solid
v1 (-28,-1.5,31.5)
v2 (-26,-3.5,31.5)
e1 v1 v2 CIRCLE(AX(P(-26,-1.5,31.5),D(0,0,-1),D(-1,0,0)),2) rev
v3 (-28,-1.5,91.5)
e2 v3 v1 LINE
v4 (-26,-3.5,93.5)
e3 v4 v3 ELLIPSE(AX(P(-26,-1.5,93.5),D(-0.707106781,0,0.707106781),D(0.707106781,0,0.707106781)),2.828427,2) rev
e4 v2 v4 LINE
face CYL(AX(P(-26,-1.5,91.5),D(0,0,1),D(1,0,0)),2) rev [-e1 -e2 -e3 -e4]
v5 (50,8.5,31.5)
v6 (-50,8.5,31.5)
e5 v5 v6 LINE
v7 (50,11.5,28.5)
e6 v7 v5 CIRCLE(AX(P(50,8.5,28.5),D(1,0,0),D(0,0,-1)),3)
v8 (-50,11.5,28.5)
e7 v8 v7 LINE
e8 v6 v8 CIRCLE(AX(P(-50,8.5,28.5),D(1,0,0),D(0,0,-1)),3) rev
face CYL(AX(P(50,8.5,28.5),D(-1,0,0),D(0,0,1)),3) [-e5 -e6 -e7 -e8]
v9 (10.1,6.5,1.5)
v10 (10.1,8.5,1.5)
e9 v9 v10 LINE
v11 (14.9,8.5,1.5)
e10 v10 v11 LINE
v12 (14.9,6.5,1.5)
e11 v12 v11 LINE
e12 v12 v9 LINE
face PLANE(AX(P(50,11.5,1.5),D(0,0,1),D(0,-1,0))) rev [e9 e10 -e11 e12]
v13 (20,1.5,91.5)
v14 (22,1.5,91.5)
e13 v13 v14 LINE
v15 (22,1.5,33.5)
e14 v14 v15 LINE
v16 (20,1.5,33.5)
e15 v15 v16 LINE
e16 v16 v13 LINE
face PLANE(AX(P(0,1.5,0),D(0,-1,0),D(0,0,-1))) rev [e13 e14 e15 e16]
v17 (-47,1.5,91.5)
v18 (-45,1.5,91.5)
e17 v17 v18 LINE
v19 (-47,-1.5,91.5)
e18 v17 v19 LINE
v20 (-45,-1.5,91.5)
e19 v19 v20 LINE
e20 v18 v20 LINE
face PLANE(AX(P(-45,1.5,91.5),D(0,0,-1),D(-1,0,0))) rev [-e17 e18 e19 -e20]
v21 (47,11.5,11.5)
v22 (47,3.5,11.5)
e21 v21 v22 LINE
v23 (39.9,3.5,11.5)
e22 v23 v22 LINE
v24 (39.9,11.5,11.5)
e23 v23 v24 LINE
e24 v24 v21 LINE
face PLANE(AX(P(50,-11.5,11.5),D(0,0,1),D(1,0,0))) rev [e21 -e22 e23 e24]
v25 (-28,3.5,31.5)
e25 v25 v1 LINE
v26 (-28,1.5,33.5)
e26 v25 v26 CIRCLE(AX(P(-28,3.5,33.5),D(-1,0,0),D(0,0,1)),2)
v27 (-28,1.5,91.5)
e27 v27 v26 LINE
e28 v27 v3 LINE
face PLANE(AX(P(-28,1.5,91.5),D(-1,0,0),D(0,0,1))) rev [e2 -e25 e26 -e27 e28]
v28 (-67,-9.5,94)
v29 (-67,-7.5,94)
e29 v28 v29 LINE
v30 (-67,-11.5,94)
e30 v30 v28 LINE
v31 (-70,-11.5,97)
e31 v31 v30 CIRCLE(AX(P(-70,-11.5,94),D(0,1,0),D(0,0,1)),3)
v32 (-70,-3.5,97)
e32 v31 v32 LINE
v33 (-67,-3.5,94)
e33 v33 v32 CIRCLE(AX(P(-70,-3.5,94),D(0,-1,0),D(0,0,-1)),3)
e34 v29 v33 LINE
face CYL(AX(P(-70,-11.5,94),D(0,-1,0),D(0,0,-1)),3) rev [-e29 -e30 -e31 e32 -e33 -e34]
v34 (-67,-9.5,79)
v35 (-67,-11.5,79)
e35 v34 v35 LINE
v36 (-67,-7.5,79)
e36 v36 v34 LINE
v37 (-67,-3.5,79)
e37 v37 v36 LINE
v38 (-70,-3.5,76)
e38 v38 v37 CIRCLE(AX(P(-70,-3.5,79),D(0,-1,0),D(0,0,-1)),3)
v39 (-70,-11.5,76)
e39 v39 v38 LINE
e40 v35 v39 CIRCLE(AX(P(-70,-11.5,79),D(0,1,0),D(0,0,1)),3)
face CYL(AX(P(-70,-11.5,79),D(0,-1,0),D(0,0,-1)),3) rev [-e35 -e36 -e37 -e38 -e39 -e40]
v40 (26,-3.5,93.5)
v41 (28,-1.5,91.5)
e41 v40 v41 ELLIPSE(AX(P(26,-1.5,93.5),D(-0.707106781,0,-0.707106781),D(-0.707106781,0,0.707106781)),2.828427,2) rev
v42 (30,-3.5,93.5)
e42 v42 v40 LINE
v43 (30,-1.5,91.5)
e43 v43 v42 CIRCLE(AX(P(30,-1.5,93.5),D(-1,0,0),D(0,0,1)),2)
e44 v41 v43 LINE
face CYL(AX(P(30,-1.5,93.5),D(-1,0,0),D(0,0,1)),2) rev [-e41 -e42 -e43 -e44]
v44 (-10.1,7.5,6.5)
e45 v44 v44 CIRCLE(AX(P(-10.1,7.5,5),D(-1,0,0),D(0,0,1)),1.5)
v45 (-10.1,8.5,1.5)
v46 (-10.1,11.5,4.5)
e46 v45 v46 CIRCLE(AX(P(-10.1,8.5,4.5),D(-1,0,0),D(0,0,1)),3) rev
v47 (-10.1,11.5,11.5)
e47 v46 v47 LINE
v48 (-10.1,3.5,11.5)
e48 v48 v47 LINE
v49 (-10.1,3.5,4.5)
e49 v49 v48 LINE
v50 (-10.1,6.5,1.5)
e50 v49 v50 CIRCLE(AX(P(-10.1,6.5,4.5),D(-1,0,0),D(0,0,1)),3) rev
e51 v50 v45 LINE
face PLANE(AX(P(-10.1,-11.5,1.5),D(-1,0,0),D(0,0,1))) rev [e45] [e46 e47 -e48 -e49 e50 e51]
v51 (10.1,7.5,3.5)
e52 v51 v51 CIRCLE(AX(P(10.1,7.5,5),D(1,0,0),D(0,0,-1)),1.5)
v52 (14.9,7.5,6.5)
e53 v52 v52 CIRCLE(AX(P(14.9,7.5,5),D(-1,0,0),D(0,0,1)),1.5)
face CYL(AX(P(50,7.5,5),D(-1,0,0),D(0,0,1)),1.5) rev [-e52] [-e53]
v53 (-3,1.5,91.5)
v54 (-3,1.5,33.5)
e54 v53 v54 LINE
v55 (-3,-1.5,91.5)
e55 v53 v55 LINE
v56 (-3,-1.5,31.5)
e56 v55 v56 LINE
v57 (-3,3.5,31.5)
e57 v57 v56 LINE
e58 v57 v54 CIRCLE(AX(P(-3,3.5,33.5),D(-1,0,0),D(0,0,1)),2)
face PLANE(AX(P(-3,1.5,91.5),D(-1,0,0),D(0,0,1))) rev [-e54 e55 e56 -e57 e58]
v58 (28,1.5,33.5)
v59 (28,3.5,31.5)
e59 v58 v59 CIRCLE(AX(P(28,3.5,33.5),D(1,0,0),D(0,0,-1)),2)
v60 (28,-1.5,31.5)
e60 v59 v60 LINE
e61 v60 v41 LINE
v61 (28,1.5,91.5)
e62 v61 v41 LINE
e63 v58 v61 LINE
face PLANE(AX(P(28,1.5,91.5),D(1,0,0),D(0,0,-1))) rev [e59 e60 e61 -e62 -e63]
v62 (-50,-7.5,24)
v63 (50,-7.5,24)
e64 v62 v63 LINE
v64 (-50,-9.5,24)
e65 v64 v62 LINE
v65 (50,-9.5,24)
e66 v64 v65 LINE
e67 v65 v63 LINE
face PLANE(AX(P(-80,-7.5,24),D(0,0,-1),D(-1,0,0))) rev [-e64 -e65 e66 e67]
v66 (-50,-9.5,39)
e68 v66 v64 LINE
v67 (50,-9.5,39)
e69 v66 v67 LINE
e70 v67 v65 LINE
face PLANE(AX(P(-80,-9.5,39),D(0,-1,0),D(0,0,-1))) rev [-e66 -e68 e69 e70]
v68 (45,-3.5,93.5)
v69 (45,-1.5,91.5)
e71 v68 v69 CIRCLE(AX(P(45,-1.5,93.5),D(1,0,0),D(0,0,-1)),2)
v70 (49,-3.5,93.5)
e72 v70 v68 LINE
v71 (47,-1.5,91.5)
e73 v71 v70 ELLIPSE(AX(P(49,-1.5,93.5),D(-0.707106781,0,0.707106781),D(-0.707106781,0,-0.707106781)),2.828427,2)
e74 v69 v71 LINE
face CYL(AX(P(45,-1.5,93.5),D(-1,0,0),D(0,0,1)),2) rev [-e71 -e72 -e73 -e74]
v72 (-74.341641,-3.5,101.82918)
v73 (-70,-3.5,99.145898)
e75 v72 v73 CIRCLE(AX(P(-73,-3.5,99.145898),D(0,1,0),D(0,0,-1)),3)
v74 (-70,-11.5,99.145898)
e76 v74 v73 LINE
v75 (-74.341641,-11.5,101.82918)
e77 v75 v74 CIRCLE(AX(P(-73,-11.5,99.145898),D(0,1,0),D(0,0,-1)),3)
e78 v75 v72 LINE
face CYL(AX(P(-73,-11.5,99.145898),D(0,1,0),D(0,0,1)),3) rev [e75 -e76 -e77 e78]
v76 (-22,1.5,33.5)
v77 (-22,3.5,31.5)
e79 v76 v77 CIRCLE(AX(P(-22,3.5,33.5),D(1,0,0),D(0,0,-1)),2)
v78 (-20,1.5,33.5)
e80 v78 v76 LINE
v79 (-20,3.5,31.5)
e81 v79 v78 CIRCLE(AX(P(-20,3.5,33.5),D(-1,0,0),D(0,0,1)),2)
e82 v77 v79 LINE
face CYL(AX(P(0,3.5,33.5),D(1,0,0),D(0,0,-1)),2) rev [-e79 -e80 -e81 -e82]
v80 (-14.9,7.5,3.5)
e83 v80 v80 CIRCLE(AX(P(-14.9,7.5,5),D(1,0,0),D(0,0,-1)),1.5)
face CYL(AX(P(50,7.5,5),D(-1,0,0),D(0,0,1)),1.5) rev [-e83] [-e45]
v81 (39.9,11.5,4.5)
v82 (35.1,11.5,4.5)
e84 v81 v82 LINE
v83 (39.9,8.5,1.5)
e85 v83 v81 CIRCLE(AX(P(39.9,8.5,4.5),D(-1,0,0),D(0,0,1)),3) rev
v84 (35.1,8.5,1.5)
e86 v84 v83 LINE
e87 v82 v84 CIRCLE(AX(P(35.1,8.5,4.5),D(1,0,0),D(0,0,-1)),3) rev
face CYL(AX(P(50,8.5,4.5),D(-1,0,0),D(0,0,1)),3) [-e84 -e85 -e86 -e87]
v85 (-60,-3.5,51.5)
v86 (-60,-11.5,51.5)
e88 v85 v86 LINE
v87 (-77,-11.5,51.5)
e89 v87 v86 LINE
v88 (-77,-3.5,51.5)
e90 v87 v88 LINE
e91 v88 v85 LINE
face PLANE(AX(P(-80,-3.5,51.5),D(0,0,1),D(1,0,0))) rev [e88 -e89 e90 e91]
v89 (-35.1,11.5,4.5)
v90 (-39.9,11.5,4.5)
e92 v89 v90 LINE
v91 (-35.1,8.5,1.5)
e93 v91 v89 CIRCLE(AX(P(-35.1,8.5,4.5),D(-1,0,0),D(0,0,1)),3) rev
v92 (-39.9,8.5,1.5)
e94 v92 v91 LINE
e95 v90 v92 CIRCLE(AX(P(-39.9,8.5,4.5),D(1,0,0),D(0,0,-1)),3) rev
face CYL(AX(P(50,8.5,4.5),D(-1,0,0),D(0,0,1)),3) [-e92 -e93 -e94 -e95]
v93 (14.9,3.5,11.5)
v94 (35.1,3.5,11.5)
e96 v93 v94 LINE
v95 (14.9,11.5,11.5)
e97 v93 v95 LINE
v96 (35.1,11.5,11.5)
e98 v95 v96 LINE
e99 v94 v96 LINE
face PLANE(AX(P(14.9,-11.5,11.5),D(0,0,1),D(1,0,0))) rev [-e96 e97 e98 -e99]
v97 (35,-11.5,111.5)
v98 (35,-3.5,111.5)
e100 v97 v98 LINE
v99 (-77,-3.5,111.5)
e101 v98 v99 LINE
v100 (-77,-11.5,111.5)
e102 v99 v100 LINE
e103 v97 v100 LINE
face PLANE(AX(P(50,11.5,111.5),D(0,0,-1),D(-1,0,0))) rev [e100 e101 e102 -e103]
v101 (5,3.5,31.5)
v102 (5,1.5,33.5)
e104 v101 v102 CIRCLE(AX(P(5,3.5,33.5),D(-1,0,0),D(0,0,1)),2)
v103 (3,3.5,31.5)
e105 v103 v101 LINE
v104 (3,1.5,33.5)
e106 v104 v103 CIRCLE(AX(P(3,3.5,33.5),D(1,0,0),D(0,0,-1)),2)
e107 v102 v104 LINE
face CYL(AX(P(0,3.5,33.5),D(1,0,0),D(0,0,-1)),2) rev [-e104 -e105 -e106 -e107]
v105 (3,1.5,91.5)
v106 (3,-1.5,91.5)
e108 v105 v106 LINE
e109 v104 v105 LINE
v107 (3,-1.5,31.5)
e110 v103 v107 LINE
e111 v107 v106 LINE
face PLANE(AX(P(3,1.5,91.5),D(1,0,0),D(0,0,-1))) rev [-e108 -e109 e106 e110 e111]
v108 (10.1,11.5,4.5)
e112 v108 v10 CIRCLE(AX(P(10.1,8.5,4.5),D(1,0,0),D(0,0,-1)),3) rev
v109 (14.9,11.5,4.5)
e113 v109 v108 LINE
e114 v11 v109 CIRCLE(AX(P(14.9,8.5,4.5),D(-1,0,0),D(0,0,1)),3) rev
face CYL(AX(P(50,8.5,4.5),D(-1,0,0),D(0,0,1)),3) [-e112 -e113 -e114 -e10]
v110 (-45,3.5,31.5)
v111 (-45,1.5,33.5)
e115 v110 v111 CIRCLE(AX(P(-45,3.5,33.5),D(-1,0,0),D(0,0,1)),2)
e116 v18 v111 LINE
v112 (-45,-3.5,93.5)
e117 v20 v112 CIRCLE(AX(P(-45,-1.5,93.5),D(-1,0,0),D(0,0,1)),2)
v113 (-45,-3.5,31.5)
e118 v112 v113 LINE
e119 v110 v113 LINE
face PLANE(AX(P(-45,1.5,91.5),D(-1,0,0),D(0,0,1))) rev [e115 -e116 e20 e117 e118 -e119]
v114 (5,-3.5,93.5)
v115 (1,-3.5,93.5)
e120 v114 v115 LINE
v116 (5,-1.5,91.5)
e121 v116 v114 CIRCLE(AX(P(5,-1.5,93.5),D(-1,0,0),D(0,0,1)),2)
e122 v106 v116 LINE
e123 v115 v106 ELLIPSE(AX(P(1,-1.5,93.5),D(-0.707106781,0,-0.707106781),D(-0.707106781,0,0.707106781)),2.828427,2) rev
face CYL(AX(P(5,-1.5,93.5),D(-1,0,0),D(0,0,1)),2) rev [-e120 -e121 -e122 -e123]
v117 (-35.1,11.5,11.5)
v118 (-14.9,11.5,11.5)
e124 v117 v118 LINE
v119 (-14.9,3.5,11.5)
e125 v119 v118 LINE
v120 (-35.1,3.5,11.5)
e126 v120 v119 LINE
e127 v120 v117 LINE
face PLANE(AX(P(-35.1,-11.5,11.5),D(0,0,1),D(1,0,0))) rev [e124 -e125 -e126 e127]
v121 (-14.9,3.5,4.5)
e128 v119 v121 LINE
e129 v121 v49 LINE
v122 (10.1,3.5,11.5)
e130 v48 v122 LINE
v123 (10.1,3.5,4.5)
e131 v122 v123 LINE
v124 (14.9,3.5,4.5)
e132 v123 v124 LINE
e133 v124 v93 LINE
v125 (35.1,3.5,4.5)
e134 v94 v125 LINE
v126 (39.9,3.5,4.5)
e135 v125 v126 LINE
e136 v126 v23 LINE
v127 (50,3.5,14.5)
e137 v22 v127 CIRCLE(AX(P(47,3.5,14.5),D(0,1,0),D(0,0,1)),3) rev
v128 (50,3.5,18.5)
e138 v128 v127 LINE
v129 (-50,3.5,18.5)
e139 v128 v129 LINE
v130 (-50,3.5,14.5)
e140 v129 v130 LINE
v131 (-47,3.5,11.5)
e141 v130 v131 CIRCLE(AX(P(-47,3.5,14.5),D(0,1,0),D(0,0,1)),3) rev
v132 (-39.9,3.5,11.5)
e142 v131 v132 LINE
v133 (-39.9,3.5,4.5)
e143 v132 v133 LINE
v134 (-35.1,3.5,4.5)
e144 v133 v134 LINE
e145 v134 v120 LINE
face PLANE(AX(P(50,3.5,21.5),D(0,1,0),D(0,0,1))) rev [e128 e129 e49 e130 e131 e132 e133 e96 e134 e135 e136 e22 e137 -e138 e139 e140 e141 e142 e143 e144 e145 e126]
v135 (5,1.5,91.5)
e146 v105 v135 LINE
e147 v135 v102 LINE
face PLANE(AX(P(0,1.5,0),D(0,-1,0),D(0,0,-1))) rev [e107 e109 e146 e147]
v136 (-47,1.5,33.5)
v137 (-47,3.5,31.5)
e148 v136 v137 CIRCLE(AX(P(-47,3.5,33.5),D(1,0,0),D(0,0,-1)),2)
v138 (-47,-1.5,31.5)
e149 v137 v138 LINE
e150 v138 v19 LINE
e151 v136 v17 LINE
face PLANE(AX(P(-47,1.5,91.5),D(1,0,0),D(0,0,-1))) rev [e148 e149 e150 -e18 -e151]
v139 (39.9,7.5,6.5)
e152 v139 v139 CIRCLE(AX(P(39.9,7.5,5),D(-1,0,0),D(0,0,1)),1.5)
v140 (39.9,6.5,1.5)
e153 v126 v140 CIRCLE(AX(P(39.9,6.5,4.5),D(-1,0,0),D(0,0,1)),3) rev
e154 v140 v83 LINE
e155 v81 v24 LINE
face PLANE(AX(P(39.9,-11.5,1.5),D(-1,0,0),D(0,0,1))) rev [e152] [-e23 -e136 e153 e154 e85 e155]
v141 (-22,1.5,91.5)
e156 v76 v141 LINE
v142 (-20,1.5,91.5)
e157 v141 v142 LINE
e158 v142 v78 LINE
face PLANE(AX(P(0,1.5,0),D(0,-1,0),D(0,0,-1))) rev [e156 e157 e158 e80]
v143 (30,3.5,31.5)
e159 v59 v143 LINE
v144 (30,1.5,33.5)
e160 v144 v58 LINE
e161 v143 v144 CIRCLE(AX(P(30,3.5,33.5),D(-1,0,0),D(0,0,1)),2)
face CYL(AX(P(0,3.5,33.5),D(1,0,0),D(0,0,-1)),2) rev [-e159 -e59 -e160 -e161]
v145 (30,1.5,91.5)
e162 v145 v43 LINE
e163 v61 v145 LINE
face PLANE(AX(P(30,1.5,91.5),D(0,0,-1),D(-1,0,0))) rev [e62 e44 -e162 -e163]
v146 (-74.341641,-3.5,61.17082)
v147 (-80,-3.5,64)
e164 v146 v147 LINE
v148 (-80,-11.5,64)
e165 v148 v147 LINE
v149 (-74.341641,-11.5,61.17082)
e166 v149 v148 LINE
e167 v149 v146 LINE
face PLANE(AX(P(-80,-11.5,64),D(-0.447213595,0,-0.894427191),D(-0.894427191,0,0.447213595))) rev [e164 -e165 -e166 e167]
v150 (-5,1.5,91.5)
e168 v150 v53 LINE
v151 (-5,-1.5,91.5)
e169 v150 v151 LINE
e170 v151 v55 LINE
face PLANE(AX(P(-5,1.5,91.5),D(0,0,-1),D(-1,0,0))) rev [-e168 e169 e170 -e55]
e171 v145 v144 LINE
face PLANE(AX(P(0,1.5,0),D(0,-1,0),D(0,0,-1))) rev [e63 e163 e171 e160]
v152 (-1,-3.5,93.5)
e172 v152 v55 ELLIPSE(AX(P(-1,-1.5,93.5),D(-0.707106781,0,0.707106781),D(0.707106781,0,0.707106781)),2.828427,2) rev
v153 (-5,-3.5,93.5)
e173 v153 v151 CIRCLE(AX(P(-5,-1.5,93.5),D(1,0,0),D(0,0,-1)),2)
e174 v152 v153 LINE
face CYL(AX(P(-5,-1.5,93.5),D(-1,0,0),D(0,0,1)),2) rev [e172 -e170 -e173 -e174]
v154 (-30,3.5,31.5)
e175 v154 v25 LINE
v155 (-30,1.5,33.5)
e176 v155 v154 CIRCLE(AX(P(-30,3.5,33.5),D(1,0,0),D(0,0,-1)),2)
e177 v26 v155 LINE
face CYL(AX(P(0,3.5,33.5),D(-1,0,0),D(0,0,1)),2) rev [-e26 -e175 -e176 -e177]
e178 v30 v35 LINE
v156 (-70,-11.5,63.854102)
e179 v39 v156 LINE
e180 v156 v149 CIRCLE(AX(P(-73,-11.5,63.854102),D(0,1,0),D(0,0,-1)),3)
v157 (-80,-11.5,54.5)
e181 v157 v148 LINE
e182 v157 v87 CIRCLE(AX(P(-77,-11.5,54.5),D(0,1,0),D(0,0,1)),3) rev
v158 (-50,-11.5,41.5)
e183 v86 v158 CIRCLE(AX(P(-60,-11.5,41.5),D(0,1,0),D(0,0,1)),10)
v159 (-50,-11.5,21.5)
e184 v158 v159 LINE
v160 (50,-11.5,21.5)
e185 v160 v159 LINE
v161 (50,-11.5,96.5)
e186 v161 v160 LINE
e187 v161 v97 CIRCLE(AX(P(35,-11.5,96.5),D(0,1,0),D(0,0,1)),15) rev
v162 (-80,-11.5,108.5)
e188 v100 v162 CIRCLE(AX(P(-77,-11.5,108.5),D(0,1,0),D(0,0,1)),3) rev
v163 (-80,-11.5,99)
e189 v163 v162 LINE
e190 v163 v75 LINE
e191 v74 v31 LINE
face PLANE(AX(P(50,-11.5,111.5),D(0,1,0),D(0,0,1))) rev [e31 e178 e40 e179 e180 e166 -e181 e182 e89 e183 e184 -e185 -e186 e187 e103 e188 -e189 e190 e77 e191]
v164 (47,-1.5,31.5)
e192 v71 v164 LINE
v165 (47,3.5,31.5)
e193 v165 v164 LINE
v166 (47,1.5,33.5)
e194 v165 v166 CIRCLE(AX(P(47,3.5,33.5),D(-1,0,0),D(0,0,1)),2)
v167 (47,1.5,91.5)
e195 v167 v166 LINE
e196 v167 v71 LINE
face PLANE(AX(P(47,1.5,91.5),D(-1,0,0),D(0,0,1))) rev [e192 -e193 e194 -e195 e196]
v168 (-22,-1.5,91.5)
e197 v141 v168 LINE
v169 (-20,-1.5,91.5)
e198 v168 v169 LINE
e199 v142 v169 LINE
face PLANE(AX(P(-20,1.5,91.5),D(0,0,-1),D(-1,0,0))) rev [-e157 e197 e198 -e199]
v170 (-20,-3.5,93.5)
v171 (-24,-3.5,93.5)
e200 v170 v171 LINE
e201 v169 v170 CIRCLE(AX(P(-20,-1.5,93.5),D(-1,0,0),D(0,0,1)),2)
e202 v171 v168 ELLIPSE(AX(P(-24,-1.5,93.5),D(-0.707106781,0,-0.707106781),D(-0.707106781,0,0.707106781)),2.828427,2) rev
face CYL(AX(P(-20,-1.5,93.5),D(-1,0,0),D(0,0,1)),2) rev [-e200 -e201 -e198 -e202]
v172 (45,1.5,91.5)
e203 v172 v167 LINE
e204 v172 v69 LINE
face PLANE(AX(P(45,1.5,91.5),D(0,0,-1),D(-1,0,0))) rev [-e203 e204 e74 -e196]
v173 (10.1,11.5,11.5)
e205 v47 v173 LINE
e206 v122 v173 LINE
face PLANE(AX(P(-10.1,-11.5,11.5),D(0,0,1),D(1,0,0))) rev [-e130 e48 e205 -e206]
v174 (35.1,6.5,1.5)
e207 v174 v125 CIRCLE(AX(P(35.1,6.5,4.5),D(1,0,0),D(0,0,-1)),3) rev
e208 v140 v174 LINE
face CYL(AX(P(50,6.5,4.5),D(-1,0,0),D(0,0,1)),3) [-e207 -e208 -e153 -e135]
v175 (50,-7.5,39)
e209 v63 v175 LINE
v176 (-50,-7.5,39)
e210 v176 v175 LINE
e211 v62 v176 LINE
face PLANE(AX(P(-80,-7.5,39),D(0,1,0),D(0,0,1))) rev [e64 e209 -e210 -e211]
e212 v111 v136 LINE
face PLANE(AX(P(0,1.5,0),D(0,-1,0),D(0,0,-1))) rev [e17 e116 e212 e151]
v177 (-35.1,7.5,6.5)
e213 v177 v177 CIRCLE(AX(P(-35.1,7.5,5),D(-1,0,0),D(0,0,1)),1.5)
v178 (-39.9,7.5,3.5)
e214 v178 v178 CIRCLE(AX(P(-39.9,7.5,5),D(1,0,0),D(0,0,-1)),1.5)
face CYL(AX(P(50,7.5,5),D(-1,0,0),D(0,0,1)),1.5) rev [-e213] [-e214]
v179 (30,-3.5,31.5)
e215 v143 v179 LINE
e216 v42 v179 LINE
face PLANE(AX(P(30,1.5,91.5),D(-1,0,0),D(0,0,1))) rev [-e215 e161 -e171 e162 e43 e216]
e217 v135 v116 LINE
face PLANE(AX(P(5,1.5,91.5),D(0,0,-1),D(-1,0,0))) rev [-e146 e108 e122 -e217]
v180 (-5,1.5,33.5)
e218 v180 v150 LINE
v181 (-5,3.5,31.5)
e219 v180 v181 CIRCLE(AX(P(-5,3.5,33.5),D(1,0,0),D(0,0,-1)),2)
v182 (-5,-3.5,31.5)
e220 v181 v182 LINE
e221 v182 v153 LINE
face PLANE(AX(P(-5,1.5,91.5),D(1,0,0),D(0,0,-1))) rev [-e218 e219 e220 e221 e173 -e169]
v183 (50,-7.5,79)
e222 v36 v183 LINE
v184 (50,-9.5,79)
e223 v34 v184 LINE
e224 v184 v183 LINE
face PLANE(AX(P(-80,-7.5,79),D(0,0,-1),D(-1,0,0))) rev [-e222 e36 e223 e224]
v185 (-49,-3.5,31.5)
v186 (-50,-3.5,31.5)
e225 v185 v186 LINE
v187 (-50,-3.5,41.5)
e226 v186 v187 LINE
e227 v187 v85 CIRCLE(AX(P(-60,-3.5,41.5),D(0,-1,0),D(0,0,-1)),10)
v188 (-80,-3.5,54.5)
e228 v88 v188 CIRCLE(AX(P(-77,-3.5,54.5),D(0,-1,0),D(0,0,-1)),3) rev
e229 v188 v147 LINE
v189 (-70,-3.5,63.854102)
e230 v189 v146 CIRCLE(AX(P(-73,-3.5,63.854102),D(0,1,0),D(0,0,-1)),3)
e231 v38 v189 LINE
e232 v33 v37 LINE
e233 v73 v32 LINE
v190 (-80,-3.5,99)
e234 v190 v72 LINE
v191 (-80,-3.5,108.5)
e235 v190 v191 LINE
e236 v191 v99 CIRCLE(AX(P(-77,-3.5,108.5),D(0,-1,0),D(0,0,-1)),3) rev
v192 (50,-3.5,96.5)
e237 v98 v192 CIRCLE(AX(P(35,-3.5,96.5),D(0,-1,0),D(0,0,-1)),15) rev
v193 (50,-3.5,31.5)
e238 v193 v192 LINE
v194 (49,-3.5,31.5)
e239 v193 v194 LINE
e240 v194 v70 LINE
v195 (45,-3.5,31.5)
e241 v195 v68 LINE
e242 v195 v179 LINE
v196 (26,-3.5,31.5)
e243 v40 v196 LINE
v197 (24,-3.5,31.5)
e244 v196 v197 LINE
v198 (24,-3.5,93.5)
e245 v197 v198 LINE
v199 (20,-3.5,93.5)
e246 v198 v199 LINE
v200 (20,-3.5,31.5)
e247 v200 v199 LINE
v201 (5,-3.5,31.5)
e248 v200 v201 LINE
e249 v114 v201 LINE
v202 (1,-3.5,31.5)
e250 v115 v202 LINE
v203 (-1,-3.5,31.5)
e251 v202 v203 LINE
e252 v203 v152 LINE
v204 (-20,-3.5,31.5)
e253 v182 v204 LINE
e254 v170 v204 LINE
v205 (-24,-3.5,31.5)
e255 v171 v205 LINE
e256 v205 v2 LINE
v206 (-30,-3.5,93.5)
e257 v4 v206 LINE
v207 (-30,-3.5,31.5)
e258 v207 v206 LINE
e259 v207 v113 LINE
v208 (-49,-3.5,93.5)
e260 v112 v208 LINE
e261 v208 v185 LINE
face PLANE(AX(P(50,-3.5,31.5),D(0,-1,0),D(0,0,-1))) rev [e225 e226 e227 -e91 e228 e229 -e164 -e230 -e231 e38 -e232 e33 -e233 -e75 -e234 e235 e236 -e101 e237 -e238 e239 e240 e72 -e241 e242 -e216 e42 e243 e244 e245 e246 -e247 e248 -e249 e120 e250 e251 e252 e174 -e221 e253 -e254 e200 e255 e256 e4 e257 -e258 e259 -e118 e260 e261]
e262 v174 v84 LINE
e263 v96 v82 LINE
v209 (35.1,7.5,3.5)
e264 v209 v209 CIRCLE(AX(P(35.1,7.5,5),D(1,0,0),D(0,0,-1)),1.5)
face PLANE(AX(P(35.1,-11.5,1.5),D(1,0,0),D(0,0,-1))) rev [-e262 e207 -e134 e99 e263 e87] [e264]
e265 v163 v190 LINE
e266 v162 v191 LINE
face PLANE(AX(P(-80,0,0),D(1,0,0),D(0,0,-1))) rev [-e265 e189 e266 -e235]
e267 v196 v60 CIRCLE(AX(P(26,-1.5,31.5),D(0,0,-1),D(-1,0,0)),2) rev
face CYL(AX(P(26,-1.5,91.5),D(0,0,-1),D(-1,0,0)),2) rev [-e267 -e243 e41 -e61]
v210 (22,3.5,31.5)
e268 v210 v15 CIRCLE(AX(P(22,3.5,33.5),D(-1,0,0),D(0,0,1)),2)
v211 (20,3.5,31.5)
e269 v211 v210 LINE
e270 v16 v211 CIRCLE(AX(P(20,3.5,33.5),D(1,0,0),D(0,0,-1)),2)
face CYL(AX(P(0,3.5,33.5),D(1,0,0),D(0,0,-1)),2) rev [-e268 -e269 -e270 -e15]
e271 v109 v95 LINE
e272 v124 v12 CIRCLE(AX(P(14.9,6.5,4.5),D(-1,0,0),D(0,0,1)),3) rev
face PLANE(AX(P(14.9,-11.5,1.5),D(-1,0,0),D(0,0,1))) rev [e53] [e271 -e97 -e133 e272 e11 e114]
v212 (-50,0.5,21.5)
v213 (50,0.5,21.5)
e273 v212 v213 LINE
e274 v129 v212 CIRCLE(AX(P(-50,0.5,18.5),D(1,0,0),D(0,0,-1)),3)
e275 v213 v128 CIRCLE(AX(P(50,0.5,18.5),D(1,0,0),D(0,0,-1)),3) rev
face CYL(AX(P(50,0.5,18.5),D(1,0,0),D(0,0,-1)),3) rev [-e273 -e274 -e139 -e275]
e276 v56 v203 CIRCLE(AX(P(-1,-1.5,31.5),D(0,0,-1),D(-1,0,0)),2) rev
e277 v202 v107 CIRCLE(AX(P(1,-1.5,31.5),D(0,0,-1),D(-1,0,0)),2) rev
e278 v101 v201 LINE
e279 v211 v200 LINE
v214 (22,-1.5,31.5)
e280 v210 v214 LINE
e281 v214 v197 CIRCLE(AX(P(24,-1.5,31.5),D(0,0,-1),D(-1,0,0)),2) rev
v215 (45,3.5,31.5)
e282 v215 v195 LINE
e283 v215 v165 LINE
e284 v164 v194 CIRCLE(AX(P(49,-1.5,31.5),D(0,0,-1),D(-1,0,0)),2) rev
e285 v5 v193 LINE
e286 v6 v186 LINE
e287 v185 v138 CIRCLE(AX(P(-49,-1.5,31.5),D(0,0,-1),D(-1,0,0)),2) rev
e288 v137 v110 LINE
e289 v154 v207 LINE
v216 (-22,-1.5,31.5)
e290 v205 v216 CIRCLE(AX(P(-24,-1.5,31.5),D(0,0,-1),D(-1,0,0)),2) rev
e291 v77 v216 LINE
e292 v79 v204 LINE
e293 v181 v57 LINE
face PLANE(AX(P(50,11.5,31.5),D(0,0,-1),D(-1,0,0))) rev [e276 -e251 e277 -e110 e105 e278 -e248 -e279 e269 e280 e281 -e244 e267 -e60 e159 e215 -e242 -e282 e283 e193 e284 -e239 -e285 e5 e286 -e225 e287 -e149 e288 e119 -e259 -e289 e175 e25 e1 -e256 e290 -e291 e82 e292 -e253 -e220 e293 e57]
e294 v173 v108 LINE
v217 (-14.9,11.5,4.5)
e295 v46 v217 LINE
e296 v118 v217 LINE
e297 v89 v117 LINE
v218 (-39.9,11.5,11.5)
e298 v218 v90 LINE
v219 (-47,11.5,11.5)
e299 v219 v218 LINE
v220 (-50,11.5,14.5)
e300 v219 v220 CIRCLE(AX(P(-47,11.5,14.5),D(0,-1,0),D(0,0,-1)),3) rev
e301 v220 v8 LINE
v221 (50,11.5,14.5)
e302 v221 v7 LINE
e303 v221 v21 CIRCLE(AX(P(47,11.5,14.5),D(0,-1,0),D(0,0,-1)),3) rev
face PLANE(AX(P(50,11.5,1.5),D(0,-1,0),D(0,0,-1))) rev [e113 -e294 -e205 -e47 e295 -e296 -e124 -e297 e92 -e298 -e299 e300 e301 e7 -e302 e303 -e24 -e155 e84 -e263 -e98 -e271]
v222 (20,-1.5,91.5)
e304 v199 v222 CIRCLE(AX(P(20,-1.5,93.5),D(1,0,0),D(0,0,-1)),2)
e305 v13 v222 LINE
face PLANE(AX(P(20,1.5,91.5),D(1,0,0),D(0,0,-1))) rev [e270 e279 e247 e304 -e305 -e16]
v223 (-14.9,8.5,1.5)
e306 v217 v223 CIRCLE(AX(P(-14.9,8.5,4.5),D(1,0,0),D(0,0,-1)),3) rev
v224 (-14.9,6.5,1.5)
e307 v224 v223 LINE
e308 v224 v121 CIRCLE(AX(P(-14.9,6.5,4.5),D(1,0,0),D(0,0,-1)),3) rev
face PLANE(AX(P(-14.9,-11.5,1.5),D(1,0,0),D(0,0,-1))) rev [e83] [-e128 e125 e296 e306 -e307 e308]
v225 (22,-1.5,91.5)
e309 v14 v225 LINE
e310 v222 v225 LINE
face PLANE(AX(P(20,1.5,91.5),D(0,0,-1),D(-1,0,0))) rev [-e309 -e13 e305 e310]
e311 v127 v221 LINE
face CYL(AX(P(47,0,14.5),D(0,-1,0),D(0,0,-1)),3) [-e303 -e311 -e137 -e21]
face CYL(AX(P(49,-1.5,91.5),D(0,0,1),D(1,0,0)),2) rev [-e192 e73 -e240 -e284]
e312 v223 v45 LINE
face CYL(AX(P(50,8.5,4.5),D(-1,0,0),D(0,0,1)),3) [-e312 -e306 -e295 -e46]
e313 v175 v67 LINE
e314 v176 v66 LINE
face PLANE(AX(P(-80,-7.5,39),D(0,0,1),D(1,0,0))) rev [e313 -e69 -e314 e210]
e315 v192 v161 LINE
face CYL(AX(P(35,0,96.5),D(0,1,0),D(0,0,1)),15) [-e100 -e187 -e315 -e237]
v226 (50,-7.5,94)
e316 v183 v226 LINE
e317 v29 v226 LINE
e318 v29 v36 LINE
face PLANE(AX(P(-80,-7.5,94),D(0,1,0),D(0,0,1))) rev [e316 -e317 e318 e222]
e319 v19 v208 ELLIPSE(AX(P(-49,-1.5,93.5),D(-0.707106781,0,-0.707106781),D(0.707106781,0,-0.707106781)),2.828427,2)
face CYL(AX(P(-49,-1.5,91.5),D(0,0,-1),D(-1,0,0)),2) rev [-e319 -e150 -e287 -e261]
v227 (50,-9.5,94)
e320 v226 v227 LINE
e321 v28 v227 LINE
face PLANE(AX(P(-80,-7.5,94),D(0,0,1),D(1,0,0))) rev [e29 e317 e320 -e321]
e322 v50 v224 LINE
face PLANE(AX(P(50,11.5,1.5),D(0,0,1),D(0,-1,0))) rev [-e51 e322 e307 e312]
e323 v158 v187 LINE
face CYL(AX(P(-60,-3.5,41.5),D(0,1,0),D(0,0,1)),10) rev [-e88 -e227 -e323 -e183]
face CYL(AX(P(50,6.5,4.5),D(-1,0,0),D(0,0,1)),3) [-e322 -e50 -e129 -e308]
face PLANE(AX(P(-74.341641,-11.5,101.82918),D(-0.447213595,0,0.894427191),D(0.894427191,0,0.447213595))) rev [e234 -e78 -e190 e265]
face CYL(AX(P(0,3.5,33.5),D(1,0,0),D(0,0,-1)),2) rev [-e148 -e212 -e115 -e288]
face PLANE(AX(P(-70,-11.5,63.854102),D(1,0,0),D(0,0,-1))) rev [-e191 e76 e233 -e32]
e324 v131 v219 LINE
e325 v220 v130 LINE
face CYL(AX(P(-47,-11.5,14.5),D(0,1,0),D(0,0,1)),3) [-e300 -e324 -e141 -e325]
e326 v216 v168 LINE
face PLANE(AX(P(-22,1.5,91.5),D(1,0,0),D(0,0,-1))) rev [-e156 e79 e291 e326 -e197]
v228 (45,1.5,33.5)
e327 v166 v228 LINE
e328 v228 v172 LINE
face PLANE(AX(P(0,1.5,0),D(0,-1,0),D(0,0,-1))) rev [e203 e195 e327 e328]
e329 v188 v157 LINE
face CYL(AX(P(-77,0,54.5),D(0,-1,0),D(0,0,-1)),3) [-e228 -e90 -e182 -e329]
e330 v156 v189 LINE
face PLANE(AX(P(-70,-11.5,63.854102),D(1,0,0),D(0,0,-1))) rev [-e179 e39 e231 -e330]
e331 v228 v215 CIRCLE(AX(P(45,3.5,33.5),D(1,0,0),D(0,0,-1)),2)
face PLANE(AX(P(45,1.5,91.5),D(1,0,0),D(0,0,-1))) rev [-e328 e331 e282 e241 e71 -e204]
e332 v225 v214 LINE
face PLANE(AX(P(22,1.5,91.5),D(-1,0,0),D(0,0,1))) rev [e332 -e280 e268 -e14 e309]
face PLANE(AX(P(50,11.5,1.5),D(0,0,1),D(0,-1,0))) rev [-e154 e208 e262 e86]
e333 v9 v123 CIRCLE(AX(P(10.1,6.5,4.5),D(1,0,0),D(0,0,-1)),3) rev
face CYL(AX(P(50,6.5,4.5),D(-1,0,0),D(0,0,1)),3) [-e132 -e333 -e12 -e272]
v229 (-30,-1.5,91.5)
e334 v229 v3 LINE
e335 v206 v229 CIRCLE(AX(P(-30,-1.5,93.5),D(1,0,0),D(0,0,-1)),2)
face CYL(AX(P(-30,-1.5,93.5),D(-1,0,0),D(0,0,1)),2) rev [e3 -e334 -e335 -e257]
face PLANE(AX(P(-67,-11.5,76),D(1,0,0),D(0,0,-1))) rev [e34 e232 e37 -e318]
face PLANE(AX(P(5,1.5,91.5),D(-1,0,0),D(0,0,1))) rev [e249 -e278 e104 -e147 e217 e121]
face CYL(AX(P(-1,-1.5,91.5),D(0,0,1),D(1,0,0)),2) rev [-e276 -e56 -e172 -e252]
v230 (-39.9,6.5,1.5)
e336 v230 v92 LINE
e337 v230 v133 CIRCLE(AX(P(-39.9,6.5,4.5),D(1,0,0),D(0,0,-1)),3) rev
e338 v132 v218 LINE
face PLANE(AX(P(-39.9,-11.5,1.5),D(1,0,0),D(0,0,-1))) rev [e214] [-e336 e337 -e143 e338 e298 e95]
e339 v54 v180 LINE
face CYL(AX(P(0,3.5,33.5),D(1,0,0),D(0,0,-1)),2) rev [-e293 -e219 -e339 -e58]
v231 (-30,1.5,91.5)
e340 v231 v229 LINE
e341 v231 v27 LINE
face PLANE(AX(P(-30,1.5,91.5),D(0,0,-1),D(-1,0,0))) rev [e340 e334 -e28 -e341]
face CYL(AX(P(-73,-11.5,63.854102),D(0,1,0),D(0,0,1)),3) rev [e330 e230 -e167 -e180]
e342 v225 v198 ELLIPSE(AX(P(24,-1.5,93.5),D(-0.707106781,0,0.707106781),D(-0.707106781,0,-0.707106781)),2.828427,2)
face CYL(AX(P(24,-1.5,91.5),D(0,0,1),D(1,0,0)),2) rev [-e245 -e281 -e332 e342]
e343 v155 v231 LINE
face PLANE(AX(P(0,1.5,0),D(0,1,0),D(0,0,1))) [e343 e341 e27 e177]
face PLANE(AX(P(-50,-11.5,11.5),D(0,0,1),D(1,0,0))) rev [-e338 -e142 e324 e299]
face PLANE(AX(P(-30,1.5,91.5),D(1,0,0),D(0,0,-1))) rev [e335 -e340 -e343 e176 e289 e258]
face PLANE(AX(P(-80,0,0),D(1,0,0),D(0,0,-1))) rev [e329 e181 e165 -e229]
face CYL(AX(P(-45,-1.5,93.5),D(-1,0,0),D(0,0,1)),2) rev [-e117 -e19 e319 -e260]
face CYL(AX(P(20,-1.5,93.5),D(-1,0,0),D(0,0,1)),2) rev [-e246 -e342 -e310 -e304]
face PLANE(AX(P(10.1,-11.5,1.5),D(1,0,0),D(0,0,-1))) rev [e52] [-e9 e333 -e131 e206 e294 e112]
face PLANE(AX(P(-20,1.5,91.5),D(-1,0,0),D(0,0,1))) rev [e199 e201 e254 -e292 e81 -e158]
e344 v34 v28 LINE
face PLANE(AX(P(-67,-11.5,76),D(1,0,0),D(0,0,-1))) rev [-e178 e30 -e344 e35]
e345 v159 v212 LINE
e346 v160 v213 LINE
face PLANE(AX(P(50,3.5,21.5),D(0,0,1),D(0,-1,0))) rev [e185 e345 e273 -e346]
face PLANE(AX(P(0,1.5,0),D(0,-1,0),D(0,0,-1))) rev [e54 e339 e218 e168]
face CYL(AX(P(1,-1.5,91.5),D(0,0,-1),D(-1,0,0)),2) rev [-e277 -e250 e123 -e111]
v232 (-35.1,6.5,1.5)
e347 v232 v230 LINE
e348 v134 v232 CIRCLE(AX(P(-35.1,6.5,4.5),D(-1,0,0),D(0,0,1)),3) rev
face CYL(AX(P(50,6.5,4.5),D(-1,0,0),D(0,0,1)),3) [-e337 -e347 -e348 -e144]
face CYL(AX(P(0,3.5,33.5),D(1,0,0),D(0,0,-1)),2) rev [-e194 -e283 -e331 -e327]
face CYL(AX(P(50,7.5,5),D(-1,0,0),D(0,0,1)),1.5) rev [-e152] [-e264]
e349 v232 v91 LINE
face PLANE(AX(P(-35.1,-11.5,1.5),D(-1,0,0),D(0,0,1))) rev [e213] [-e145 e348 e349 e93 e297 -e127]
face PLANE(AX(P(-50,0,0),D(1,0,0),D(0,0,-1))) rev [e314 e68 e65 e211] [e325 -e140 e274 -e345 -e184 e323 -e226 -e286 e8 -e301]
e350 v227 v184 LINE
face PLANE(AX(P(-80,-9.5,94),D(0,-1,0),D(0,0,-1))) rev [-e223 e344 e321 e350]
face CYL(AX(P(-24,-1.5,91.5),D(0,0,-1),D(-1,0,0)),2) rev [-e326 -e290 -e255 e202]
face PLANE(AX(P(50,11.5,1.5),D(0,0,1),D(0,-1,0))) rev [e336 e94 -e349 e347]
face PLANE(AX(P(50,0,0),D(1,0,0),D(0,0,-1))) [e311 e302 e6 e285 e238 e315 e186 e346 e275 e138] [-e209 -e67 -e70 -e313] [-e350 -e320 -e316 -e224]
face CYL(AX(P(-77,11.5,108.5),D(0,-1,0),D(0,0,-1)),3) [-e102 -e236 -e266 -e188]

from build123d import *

# Parameters (mm, degrees)
CROQUIS1_R                 = 1.5
SALIENTE_EXTRUIR1_DEPTH    = 50
CORTAR_EXTRUIR1_DEPTH      = 123.737524824
CORTAR_EXTRUIR1_DEPTH_BACK = 123.737524824
CROQUIS2_W                 = 10.1
CROQUIS2_H                 = 10
CROQUIS2_W_2               = 20.2
REDONDEO3_R                = 3
CROQUIS6_W                 = 80
CROQUIS6_H                 = 15
CORTAR_EXTRUIR5_DEPTH      = 151.214846137
CROQUIS29_W                = 2
CROQUIS29_H                = 60
SALIENTE_EXTRUIR16_DEPTH   = 5
REDONDEO17_R               = 2
CROQUIS19_W                = 60
CROQUIS19_H                = 8
SALIENTE_EXTRUIR10_DEPTH   = 30
REDONDEO12_R               = 15
REDONDEO15_R               = 3
REDONDEO23_R               = 10
CORTAR_EXTRUIR6_DEPTH      = 139.047998899
CORTAR_EXTRUIR4_DEPTH      = 138.71165528
CORTAR_EXTRUIR4_DEPTH_BACK = 138.71165528
CROQUIS4_W                 = 15
CROQUIS4_H                 = 2
REDONDEO24_R               = 3
CROQUIS31_W                = 3
CROQUIS31_H                = 21
CORTAR_EXTRUIR7_DEPTH      = 139.047998899
REDONDEO27_R               = 3


with BuildPart() as part:
    # Croquis1 → Saliente-Extruir1 (new, symmetric)
    with BuildSketch(Plane(origin=(0, 0, 0), x_dir=(0, 0, -1), z_dir=(1, 0, 0))):
        Polygon((-1.5, 11.5), (-1.5, 3.5), (-21.5, 3.5), (-21.5, -11.5), (-111.5, -11.5), (-111.5, 11.5), align=None)
        with Locations((-5, 7.5)):
            Circle(CROQUIS1_R, mode=Mode.SUBTRACT)
    extrude(amount=SALIENTE_EXTRUIR1_DEPTH, both=True)

    # Croquis2 → Cortar-Extruir1 (cut, two sides: drawn at the far end of the back side and taken through both)
    with BuildSketch(Plane(origin=(0, 0, 0), x_dir=(1, 0, 0), z_dir=(0, 1, 0)).offset(-CORTAR_EXTRUIR1_DEPTH_BACK)):
        with Locations((-44.95, -6.5)):
            Rectangle(CROQUIS2_W, CROQUIS2_H)
        with Locations((-25, -6.5)):
            Rectangle(CROQUIS2_W_2, CROQUIS2_H)
        with Locations((0, -6.5)):
            Rectangle(CROQUIS2_W_2, CROQUIS2_H)
        with Locations((25, -6.5)):
            Rectangle(CROQUIS2_W_2, CROQUIS2_H)
        with Locations((44.95, -6.5)):
            Rectangle(CROQUIS2_W, CROQUIS2_H)
    extrude(amount=CORTAR_EXTRUIR1_DEPTH + CORTAR_EXTRUIR1_DEPTH_BACK, mode=Mode.SUBTRACT)

    # Redondeo3
    redondeo3_edges = [part.edges().sort_by_distance(p)[0] for p in [
        (0, 3.5, 21.5),
        (37.5, 11.5, 1.5),
        (12.5, 11.5, 1.5),
        (-12.5, 11.5, 1.5),
        (-37.5, 11.5, 1.5),
        (37.5, 3.5, 1.5),
        (12.5, 3.5, 1.5),
        (-12.5, 3.5, 1.5),
        (-37.5, 3.5, 1.5),
        (-50, 7.5, 11.5),
        (50, 7.5, 11.5),
    ]]
    fillet(redondeo3_edges, radius=REDONDEO3_R)

    # Croquis6 → Cortar-Extruir5 (cut, through all)
    with BuildSketch(Plane.ZY.offset(50)):
        with Locations((71.5, 4)):
            Rectangle(CROQUIS6_W, CROQUIS6_H)
    extrude(amount=-CORTAR_EXTRUIR5_DEPTH, mode=Mode.SUBTRACT)

    # Croquis29 → Saliente-Extruir16 (add)
    with BuildSketch(Plane(origin=(0, -3.5, 0), x_dir=(1, 0, 0), z_dir=(0, 1, 0))):
        with Locations((-46, -61.5)):
            Rectangle(CROQUIS29_W, CROQUIS29_H)
        with Locations((-29, -61.5)):
            Rectangle(CROQUIS29_W, CROQUIS29_H)
        with Locations((-21, -61.5)):
            Rectangle(CROQUIS29_W, CROQUIS29_H)
        with Locations((-4, -61.5)):
            Rectangle(CROQUIS29_W, CROQUIS29_H)
        with Locations((4, -61.5)):
            Rectangle(CROQUIS29_W, CROQUIS29_H)
        with Locations((21, -61.5)):
            Rectangle(CROQUIS29_W, CROQUIS29_H)
        with Locations((29, -61.5)):
            Rectangle(CROQUIS29_W, CROQUIS29_H)
        with Locations((46, -61.5)):
            Rectangle(CROQUIS29_W, CROQUIS29_H)
    extrude(amount=SALIENTE_EXTRUIR16_DEPTH)

    # Redondeo17
    redondeo17_edges = [part.edges().sort_by_distance(p)[0] for p in [
        (-46, -3.5, 91.5),
        (-47, -3.5, 61.5),
        (-46, 1.5, 31.5),
        (-29, -3.5, 91.5),
        (-28, -3.5, 61.5),
        (-29, 1.5, 31.5),
        (-21, -3.5, 91.5),
        (-22, -3.5, 61.5),
        (-21, 1.5, 31.5),
        (-4, -3.5, 91.5),
        (-3, -3.5, 61.5),
        (-4, 1.5, 31.5),
        (4, -3.5, 91.5),
        (3, -3.5, 61.5),
        (4, 1.5, 31.5),
        (21, -3.5, 91.5),
        (22, -3.5, 61.5),
        (21, 1.5, 31.5),
        (29, -3.5, 91.5),
        (28, -3.5, 61.5),
        (29, 1.5, 31.5),
        (46, -3.5, 91.5),
        (47, -3.5, 61.5),
        (46, 1.5, 31.5),
    ]]
    fillet(redondeo17_edges, radius=REDONDEO17_R)

    # Croquis19 → Saliente-Extruir10 (add)
    with BuildSketch(Plane.ZY.offset(50)):
        with Locations((81.5, -7.5)):
            Rectangle(CROQUIS19_W, CROQUIS19_H)
    extrude(amount=SALIENTE_EXTRUIR10_DEPTH)

    # Redondeo12
    redondeo12_edges = [part.edges().sort_by_distance(p)[0] for p in [
        (50, -7.5, 111.5),
    ]]
    fillet(redondeo12_edges, radius=REDONDEO12_R)

    # Redondeo15
    redondeo15_edges = [part.edges().sort_by_distance(p)[0] for p in [
        (0, 11.5, 31.5),
    ]]
    fillet(redondeo15_edges, radius=REDONDEO15_R)

    # Redondeo23
    redondeo23_edges = [part.edges().sort_by_distance(p)[0] for p in [
        (-50, -7.5, 51.5),
    ]]
    fillet(redondeo23_edges, radius=REDONDEO23_R)

    # Croquis30 → Cortar-Extruir6 (cut, through all)
    with BuildSketch(Plane(origin=(0, -3.5, 0), x_dir=(1, 0, 0), z_dir=(0, 1, 0))):
        with BuildLine():
            Line((-80, -64), (-74.341640786, -61.170820393))
            ThreePointArc((-74.341640786, -61.170820393), (-71.422806664, -61.302149541), (-70, -63.854101966))
            Line((-70, -63.854101966), (-70, -99.145898034))
            ThreePointArc((-70, -99.145898034), (-71.422806664, -101.697850459), (-74.341640786, -101.829179607))
            Line((-74.341640786, -101.829179607), (-80, -99))
            Line((-80, -99), (-80, -64))
        make_face()
    extrude(amount=-CORTAR_EXTRUIR6_DEPTH, mode=Mode.SUBTRACT)

    # Croquis4 → Cortar-Extruir4 (cut, two sides: drawn at the far end of the back side and taken through both)
    with BuildSketch(Plane(origin=(0, 0, 0), x_dir=(0, 0, -1), z_dir=(1, 0, 0)).offset(-CORTAR_EXTRUIR4_DEPTH_BACK)):
        with Locations((-86.5, -8.5)):
            Rectangle(CROQUIS4_W, CROQUIS4_H)
        with Locations((-31.5, -8.5)):
            Rectangle(CROQUIS4_W, CROQUIS4_H)
    extrude(amount=CORTAR_EXTRUIR4_DEPTH + CORTAR_EXTRUIR4_DEPTH_BACK, mode=Mode.SUBTRACT)

    # Redondeo24
    redondeo24_edges = [part.edges().sort_by_distance(p)[0] for p in [
        (-80, -7.5, 111.5),
        (-80, -7.5, 51.5),
    ]]
    fillet(redondeo24_edges, radius=REDONDEO24_R)

    # Croquis31 → Cortar-Extruir7 (cut, through all)
    with BuildSketch(Plane(origin=(0, -3.5, 0), x_dir=(1, 0, 0), z_dir=(0, 1, 0))):
        with Locations((-68.5, -86.5)):
            Rectangle(CROQUIS31_W, CROQUIS31_H)
    extrude(amount=-CORTAR_EXTRUIR7_DEPTH, mode=Mode.SUBTRACT)

    # Redondeo27
    redondeo27_edges = [part.edges().sort_by_distance(p)[0] for p in [
        (-67, -7.5, 76),
        (-67, -7.5, 97),
    ]]
    fillet(redondeo27_edges, radius=REDONDEO27_R - 0.0001)  # a hair under: the kernel refuses the full size


solid = part.part
